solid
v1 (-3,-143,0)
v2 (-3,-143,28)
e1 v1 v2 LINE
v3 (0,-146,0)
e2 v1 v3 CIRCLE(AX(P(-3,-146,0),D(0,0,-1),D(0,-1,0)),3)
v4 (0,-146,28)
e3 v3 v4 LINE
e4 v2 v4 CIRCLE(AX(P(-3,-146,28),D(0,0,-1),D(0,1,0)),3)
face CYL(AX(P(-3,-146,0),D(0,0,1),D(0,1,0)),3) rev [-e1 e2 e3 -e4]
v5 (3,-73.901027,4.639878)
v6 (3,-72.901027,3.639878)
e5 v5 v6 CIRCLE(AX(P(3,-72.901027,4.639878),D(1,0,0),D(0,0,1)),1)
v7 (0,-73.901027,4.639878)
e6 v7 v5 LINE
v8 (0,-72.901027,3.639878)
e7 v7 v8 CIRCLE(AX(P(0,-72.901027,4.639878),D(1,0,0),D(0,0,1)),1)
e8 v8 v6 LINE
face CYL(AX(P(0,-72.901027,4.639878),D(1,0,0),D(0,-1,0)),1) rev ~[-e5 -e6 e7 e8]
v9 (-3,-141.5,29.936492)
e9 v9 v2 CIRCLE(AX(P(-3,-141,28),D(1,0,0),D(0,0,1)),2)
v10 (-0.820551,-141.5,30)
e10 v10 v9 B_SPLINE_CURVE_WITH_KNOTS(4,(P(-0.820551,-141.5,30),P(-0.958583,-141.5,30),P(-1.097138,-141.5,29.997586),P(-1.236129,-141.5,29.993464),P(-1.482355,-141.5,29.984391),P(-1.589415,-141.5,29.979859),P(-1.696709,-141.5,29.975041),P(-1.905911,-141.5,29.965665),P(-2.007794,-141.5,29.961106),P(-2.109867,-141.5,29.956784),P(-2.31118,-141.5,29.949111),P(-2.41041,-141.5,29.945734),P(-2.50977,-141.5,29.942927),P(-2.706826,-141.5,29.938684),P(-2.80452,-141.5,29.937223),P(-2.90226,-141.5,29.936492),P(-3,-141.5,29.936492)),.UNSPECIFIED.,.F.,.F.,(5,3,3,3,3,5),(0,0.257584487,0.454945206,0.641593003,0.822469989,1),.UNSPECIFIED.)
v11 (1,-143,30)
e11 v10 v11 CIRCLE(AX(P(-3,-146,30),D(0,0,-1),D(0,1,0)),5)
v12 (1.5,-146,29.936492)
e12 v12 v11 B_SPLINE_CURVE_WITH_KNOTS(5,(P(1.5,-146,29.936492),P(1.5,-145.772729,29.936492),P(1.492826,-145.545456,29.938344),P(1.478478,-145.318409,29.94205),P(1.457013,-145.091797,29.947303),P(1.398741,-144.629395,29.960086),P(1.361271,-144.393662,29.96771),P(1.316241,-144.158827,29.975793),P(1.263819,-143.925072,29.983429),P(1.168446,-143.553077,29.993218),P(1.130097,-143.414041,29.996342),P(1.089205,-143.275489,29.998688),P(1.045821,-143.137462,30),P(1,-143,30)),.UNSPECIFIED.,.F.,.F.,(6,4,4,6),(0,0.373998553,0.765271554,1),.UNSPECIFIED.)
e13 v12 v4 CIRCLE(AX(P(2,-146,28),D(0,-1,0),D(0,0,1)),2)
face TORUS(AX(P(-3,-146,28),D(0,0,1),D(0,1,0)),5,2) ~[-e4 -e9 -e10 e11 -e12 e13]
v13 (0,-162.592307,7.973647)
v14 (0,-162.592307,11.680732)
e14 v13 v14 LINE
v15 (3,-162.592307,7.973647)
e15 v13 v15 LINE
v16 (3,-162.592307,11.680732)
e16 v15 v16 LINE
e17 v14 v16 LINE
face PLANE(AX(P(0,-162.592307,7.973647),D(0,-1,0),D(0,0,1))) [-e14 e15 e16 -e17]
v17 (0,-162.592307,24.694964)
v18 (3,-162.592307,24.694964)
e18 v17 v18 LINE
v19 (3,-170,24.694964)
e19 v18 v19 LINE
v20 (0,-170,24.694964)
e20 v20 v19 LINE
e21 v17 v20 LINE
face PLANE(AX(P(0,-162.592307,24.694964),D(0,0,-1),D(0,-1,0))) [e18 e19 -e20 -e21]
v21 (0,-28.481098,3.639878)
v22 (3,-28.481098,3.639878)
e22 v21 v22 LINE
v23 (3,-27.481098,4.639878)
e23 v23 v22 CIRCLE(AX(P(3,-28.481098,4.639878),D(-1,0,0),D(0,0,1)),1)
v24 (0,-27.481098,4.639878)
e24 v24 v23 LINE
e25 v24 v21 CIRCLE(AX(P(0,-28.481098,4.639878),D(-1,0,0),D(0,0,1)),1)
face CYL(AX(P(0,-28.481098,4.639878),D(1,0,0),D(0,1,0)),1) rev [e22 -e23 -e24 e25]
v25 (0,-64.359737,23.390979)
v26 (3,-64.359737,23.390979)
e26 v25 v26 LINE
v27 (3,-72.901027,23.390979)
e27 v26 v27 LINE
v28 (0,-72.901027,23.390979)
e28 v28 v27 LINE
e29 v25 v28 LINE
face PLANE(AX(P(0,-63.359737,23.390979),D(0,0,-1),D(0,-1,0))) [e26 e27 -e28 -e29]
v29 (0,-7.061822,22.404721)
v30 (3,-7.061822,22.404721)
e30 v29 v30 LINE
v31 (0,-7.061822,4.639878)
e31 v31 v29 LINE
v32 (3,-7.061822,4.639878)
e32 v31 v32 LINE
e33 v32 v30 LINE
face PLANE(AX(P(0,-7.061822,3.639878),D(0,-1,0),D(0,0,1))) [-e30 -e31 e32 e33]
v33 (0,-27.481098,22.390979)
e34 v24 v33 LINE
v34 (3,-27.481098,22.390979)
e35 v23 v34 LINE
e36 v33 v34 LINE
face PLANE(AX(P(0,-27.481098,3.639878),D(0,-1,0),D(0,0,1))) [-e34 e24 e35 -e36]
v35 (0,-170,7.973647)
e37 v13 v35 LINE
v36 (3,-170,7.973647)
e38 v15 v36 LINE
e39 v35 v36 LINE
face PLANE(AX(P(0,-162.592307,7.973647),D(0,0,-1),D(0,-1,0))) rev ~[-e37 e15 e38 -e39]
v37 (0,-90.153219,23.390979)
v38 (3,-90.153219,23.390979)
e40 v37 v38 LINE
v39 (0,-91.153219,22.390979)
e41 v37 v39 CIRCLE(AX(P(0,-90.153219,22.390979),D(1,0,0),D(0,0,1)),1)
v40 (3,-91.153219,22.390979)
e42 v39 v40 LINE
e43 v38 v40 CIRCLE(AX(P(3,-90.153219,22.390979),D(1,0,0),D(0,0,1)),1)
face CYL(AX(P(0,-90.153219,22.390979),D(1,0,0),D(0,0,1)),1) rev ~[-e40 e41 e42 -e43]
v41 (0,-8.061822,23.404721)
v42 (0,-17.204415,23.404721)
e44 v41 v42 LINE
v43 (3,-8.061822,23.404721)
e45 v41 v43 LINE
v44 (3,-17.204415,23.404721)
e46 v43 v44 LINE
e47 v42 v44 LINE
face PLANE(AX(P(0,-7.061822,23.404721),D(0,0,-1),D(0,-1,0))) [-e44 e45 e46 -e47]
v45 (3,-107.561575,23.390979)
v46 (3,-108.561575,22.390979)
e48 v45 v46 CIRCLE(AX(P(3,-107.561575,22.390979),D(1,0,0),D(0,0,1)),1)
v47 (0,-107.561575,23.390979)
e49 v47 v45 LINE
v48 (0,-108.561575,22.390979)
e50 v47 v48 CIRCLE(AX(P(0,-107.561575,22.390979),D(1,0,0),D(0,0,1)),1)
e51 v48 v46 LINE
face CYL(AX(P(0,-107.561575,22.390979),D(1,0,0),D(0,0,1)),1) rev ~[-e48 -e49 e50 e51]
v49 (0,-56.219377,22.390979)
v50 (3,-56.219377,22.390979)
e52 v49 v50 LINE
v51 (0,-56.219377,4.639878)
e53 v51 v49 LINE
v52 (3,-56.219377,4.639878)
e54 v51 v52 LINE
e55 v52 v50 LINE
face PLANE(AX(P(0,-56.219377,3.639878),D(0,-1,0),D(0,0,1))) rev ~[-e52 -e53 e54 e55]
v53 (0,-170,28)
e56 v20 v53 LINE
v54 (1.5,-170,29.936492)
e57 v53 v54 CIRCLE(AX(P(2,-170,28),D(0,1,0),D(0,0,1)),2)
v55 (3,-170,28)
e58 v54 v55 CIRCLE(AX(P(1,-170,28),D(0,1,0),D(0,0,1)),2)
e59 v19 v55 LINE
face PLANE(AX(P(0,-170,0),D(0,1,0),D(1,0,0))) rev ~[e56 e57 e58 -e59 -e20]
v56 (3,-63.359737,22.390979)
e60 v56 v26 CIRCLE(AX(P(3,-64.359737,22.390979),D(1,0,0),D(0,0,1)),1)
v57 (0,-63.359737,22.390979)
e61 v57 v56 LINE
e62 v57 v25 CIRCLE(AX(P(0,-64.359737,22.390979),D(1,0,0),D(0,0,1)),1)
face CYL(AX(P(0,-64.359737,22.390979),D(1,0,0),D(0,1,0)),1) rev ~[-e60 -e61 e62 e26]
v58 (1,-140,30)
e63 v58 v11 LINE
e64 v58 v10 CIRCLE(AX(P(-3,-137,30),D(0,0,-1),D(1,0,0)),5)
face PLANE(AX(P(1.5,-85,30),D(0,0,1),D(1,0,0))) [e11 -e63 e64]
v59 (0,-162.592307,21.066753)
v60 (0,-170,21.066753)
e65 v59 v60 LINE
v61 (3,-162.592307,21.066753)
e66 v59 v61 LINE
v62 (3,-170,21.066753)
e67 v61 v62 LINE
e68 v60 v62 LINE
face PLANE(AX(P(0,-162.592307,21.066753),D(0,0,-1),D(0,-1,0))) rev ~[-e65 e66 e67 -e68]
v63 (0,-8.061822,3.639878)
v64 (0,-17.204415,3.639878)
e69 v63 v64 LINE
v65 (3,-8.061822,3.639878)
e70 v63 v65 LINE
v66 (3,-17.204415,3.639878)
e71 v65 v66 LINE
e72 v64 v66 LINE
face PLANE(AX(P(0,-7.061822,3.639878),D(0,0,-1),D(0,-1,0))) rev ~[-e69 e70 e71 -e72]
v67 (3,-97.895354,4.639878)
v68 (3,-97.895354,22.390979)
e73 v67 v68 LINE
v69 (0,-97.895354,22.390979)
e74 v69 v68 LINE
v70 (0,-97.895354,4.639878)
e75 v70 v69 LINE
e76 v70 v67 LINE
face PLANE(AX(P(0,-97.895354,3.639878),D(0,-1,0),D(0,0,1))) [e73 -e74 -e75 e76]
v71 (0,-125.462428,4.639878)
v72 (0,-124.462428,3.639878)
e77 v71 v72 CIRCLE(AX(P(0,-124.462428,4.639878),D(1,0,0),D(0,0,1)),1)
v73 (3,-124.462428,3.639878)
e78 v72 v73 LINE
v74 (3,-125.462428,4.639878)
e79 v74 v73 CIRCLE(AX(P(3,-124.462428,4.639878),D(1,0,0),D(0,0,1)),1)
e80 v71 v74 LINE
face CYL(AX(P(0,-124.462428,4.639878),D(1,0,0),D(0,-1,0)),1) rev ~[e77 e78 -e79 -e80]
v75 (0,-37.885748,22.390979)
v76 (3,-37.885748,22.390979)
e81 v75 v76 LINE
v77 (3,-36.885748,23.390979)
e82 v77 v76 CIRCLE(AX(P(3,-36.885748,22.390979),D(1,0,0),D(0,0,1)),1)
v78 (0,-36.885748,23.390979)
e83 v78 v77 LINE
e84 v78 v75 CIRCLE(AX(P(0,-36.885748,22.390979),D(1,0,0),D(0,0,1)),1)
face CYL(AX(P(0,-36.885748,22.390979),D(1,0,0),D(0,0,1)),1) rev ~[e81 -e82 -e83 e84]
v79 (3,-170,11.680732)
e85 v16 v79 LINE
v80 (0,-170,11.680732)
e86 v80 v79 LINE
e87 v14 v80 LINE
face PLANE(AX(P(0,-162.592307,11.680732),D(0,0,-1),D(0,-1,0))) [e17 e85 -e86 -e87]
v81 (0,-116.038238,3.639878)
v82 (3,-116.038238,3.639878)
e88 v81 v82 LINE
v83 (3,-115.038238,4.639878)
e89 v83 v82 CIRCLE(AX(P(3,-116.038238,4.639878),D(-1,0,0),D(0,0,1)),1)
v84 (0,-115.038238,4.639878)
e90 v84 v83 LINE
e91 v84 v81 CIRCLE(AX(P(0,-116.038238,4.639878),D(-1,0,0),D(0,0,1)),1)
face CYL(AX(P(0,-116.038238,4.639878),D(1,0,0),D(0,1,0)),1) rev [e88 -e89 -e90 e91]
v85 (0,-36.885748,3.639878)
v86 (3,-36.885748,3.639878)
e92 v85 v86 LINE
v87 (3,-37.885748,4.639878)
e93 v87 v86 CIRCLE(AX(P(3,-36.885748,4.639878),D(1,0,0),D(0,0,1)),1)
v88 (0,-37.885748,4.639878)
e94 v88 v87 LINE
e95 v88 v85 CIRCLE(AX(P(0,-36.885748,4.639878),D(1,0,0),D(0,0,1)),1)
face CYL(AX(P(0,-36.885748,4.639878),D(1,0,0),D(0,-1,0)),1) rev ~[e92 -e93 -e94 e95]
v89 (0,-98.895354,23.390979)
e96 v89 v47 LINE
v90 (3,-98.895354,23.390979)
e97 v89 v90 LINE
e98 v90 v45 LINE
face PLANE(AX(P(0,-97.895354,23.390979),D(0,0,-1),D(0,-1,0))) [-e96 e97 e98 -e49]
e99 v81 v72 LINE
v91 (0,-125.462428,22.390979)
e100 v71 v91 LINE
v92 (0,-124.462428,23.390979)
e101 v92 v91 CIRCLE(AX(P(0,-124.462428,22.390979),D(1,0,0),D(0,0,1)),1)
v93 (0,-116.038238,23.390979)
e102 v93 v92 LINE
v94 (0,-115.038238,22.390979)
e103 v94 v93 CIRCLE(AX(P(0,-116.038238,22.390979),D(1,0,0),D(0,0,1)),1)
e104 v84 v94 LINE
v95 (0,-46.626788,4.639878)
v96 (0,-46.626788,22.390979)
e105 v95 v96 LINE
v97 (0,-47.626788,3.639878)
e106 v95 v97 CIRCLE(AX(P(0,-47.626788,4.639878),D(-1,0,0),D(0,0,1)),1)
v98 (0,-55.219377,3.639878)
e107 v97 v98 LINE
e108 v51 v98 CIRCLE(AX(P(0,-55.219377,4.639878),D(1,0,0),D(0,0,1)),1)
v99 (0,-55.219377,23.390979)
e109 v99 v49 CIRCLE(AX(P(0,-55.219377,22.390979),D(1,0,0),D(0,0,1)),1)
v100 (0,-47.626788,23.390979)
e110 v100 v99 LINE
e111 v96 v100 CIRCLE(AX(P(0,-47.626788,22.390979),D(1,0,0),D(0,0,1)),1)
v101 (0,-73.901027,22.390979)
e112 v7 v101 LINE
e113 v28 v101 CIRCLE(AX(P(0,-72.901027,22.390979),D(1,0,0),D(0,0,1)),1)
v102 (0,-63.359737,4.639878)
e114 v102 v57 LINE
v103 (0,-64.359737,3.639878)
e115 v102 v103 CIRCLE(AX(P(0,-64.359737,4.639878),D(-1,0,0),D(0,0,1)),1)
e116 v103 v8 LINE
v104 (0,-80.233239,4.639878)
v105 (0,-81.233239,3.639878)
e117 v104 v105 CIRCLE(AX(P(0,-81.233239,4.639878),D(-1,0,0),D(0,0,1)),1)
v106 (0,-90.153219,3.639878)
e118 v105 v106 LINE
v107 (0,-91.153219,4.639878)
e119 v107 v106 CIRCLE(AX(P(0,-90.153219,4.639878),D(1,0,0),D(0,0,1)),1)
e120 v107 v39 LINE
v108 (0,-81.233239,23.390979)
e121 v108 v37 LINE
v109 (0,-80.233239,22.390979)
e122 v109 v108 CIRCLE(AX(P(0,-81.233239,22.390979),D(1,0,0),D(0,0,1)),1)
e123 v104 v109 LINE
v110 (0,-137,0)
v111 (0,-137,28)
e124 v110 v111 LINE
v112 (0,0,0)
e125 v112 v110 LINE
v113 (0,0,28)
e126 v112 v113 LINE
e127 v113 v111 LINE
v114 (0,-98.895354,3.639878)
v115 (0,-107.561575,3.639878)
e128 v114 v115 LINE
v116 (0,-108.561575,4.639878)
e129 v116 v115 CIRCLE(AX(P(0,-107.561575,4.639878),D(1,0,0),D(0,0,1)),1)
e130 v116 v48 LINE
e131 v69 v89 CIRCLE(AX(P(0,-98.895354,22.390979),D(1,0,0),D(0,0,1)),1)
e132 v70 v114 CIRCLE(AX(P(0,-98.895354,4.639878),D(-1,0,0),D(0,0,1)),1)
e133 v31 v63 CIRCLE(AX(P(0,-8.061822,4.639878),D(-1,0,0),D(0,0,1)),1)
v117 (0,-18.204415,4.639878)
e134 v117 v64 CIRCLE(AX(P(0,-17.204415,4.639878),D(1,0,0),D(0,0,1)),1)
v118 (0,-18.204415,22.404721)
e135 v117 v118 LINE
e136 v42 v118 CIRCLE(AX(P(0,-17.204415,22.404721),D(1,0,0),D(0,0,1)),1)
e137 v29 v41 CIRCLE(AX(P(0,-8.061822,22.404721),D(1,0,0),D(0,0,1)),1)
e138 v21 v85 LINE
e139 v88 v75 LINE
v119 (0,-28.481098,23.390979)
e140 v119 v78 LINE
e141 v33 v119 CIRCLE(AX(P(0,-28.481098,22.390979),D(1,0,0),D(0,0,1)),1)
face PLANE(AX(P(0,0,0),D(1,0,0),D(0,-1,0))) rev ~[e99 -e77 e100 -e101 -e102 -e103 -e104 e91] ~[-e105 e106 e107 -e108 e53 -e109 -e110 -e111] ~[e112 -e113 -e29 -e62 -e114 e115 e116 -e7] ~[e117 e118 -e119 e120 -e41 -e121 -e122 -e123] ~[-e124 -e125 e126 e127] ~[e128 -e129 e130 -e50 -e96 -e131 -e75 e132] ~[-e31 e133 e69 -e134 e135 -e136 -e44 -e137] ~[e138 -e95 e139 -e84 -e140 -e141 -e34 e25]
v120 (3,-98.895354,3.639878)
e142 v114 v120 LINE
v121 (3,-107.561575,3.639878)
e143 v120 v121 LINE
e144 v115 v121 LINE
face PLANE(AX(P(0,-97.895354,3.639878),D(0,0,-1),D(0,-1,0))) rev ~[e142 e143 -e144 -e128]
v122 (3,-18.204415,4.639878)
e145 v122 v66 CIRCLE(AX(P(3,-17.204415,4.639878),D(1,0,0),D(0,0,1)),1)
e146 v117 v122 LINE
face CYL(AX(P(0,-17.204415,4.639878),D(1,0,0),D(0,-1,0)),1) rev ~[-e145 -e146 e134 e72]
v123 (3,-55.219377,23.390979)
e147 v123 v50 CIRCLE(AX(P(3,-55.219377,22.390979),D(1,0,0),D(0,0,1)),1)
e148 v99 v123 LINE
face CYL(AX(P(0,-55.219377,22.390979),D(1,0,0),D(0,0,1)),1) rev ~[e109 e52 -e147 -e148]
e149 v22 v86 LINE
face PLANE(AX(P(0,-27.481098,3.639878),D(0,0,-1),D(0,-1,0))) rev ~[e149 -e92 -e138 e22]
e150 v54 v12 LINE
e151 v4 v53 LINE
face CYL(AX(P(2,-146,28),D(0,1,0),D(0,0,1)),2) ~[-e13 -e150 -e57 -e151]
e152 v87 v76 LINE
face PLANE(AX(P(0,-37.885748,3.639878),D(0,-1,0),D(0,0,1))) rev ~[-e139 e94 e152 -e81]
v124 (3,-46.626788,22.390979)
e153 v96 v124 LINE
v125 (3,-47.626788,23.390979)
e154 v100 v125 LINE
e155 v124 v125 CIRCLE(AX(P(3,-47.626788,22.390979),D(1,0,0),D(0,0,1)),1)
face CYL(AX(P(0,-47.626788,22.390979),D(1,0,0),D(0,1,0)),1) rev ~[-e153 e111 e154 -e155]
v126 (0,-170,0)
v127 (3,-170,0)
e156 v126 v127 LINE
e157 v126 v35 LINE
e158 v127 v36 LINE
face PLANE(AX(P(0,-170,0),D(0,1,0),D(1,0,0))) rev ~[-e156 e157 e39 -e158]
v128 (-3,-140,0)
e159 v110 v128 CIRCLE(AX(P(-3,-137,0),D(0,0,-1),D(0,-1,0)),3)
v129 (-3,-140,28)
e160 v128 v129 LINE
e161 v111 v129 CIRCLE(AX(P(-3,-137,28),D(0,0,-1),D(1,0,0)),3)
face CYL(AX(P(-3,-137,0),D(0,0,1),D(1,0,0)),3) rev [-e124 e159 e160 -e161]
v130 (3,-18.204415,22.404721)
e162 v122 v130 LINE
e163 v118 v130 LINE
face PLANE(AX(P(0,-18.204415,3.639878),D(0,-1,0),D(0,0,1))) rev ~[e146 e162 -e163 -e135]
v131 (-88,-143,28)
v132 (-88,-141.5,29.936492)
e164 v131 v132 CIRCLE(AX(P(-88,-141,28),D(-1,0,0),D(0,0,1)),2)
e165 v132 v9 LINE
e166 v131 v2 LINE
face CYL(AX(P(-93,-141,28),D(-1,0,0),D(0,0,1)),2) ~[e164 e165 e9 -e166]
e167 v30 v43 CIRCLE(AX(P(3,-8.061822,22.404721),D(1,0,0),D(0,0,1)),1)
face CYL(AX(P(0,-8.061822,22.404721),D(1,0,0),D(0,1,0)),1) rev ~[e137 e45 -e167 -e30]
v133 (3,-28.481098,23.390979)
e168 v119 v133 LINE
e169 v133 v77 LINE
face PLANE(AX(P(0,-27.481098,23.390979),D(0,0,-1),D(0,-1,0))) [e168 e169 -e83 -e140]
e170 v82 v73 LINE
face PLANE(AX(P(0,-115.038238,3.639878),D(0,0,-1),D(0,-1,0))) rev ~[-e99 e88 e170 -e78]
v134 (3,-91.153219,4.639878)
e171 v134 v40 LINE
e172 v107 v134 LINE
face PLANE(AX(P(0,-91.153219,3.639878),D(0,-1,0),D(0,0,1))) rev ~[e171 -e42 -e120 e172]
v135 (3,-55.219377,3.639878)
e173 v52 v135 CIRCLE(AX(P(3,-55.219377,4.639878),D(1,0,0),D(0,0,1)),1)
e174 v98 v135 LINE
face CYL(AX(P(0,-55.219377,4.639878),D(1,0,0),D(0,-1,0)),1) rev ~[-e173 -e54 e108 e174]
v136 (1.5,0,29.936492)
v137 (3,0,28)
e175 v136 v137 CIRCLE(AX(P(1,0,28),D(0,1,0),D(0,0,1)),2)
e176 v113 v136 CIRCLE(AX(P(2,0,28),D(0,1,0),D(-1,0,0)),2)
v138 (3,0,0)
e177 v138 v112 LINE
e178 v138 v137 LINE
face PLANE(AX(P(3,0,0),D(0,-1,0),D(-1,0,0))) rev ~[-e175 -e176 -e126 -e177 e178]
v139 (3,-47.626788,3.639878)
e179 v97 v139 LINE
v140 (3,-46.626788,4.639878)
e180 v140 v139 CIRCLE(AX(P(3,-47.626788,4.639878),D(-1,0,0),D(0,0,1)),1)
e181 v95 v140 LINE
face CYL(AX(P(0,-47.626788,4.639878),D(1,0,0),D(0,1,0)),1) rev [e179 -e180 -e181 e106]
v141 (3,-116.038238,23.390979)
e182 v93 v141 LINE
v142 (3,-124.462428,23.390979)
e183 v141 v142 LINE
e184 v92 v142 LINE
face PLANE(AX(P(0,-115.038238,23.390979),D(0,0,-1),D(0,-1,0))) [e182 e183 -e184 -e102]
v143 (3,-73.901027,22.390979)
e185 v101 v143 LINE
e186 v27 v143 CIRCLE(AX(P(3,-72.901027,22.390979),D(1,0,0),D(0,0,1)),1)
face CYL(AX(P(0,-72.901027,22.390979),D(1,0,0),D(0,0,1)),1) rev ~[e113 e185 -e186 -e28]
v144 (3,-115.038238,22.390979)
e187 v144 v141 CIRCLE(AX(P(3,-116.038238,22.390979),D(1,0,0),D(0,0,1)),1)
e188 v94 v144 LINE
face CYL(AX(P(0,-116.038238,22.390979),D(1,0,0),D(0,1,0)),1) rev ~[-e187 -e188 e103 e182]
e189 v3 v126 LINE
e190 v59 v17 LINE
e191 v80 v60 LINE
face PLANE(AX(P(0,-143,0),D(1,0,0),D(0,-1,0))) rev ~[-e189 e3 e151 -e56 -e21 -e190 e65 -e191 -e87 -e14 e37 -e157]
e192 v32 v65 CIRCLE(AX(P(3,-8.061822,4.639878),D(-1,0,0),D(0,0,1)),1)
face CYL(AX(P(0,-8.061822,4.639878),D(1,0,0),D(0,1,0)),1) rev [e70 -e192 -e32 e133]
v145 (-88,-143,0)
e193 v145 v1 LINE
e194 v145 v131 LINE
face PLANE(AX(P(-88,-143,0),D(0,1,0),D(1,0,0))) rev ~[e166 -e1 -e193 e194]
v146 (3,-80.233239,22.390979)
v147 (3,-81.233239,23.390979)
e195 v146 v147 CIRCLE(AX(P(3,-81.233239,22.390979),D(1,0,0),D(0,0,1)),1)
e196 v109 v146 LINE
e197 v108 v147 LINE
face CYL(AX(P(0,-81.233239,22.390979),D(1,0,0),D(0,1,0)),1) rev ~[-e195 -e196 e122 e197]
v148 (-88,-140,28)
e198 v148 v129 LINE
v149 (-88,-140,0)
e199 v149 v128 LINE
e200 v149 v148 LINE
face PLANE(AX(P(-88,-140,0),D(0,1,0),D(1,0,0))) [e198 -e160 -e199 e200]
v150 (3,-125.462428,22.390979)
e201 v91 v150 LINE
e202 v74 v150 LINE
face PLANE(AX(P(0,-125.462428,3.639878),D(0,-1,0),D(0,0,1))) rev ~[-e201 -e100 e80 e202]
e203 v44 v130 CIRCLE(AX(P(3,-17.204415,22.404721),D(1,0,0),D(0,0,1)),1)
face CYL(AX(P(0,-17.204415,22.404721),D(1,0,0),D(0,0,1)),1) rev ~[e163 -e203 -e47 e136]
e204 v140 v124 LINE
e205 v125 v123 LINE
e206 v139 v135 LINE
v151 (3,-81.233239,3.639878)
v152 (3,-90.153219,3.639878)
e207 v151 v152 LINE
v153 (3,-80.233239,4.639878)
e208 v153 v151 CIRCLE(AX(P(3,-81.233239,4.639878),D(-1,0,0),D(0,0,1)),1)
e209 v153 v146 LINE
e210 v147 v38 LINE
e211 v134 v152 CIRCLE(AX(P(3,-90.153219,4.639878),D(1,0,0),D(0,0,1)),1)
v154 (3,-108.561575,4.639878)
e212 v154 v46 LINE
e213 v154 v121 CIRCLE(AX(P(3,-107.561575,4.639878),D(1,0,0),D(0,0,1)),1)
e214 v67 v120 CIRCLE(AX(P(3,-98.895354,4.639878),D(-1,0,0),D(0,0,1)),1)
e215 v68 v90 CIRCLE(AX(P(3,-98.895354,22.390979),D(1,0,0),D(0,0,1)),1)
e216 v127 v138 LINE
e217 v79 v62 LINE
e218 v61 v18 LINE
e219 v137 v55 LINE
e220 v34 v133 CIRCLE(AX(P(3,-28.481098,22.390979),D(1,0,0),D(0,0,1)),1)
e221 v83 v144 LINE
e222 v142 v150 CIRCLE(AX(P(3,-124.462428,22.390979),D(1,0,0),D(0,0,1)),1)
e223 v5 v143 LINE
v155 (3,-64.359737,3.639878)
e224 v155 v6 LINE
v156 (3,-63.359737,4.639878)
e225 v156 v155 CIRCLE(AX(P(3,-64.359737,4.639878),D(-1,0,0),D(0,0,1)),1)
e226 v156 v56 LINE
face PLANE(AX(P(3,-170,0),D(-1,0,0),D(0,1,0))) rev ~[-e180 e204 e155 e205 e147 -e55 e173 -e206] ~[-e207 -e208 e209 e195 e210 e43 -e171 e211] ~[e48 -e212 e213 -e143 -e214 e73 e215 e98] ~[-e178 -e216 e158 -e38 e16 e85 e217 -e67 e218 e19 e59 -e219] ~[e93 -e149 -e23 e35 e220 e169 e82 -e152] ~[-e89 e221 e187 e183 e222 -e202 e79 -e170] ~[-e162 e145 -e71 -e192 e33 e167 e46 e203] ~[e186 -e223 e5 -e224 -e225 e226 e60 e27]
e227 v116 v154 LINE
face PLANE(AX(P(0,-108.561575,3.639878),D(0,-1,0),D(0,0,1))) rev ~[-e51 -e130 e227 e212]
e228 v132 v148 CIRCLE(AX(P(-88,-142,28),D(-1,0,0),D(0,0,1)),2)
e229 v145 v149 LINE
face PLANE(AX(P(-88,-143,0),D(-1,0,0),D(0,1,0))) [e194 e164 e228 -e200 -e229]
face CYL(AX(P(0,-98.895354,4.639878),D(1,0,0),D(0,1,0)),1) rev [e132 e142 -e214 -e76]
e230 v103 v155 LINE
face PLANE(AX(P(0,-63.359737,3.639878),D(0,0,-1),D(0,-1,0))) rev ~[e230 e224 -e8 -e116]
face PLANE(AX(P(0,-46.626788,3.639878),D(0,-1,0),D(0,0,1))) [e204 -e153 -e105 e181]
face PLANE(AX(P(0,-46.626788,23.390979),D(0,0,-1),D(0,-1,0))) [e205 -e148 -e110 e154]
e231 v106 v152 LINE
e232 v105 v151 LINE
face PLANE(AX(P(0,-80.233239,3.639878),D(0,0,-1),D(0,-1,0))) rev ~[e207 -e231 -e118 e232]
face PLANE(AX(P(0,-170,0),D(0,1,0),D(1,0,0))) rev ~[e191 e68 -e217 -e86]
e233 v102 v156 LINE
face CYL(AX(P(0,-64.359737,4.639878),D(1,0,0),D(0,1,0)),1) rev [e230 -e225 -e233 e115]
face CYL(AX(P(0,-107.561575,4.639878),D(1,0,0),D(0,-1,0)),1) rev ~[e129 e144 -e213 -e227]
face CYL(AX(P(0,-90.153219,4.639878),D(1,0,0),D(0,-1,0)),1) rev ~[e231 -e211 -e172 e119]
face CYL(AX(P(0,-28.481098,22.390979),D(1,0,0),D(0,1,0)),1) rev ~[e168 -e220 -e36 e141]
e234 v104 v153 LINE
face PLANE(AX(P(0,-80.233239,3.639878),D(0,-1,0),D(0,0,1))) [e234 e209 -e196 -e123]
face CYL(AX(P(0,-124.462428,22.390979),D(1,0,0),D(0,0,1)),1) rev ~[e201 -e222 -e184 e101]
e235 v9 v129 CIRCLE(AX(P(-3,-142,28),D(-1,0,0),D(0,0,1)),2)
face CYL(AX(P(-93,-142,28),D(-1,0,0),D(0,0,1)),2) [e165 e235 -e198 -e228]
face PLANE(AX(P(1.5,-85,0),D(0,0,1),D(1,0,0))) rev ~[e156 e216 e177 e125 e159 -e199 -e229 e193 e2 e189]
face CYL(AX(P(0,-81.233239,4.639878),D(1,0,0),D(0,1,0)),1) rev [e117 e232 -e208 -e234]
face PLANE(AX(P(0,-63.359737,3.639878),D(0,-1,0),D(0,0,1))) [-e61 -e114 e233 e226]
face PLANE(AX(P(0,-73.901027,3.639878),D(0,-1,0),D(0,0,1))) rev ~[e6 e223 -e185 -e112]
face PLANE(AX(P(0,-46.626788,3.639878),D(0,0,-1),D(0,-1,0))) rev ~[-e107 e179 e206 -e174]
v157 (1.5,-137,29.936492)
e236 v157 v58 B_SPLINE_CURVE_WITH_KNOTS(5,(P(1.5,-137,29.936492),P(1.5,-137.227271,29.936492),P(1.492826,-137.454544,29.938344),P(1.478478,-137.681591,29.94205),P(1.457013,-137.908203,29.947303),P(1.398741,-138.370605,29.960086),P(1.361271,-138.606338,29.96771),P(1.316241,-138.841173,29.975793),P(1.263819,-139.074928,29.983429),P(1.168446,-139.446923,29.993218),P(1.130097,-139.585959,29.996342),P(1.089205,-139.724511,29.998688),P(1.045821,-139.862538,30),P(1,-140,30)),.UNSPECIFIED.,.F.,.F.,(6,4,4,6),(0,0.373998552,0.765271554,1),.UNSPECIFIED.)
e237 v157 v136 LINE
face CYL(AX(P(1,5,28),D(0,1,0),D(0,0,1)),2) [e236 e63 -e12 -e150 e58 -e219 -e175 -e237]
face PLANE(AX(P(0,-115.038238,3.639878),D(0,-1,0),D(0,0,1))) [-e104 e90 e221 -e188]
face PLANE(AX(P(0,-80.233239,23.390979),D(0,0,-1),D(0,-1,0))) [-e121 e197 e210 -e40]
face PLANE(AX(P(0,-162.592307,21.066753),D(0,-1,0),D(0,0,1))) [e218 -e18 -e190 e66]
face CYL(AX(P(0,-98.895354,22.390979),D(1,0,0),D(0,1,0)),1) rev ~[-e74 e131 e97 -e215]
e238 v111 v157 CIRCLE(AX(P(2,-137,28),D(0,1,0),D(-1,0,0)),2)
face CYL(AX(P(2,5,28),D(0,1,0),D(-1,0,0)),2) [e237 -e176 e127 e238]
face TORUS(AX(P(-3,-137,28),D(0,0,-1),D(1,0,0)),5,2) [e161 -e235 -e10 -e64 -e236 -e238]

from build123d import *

# Parameters (mm, degrees)
F0_W         = 88
F0_H         = 3
F1_DEPTH     = 30
F2_R         = 3
F3_T1_DEPTH  = 142
F3_T3_DEPTH  = 90
F3_T5_DEPTH  = 180
F3_T7_DEPTH  = 29
F3_T10_ANGLE = 90
F3_T12_ANGLE = 90
F4_W         = 7.4076932669
F4_H         = 3.6282110959
F4_H_2       = 3.7070848048
F5_DEPTH     = 3
F6_W         = 11.1425933428
F6_H         = 19.764843164
F6_W_2       = 10.4046501219
F6_H_2       = 19.7511005681
F6_W_3       = 9.5925889909
F6_W_4       = 10.5412900448
F6_W_5       = 10.9199807048
F6_W_6       = 10.6662213802
F6_W_7       = 10.4241892695
F7_DEPTH     = 3
F8_R         = 1


# Not quite as in the source:
# - a fillet or chamfer that OpenCascade refuses, or shapes differently, is made with other operations: its cross-section is extruded or revolved along the edge and cut away or added


with BuildPart() as f1:
    # F0 (on Top) → F1 (new body)
    with BuildSketch(Plane.XY):
        Polygon((3, 0), (0, 0), (0, -140), (0, -143), (0, -170), (3, -170), (3, -140), align=None)
        with Locations((-44, -141.5)):
            Rectangle(F0_W, F0_H)
    extrude(amount=F1_DEPTH)

    # F2
    f2_edges = [f1.edges().sort_by_distance(p)[0] for p in [
        (0, -140, 15),
        (0, -143, 15),
    ]]
    fillet(f2_edges, radius=F2_R)

    # F3: fillet of radius 2 on 3 edges, made by hand

    # F3_s2 → F3_t1 (cut)
    with BuildSketch(Plane.XZ.offset(-5)):
        with BuildLine():
            ThreePointArc((0, 28), (0.5857864376, 29.4142135624), (2, 30))
            Line((2, 30), (0, 30))
            Line((0, 30), (0, 28))
        make_face()
    extrude(amount=F3_T1_DEPTH, mode=Mode.SUBTRACT)

    # F3_s4 → F3_t3 (cut)
    with BuildSketch(Plane.YZ.offset(-93)):
        with BuildLine():
            ThreePointArc((-141, 30), (-142.4142135624, 29.4142135624), (-143, 28))
            Line((-143, 28), (-143, 30))
            Line((-143, 30), (-141, 30))
        make_face()
        with BuildLine():
            ThreePointArc((-142, 30), (-140.5857864376, 29.4142135624), (-140, 28))
            Line((-140, 28), (-140, 30))
            Line((-140, 30), (-142, 30))
        make_face()
    extrude(amount=F3_T3_DEPTH, mode=Mode.SUBTRACT)

    # F3_s6 → F3_t5 (cut)
    with BuildSketch(Plane.XZ.offset(-5)):
        with BuildLine():
            ThreePointArc((1, 30), (2.4142135624, 29.4142135624), (3, 28))
            Line((3, 28), (3, 30))
            Line((3, 30), (1, 30))
        make_face()
    extrude(amount=F3_T5_DEPTH, mode=Mode.SUBTRACT)

    # F3_s8 → F3_t7 (cut)
    with BuildSketch(Plane.XZ.offset(146)):
        with BuildLine():
            ThreePointArc((2, 30), (0.5857864376, 29.4142135624), (0, 28))
            Line((0, 28), (0, 30))
            Line((0, 30), (2, 30))
        make_face()
    extrude(amount=F3_T7_DEPTH, mode=Mode.SUBTRACT)

    # F3_s9 → F3_t10 (revolve, cut)
    with BuildSketch(Plane.YZ.offset(-3)):
        with BuildLine():
            ThreePointArc((-141, 30), (-142.4142135624, 29.4142135624), (-143, 28))
            Line((-143, 28), (-143, 30))
            Line((-143, 30), (-141, 30))
        make_face()
    revolve(axis=Axis((-3, -146, 30), (0, 0, -1)), revolution_arc=F3_T10_ANGLE, mode=Mode.SUBTRACT)

    # F3_s11 → F3_t12 (revolve, cut)
    with BuildSketch(Plane.XZ.offset(137)):
        with BuildLine():
            ThreePointArc((0, 28), (0.5857864376, 29.4142135624), (2, 30))
            Line((2, 30), (0, 30))
            Line((0, 30), (0, 28))
        make_face()
    revolve(axis=Axis((-3, -137, 30), (0, 0, -1)), revolution_arc=F3_T12_ANGLE, mode=Mode.SUBTRACT)

    # F4 (on face) → F5 (cut)
    with BuildSketch(Plane(origin=(0, 0, 0), x_dir=(0, -1, 0), z_dir=(-1, 0, 0))):
        with Locations((166.2961533666, 22.8808587417)):
            Rectangle(F4_W, F4_H)
        with Locations((166.2961533666, 9.8271891475)):
            Rectangle(F4_W, F4_H_2)
    extrude(amount=-F5_DEPTH, mode=Mode.SUBTRACT)

    # F6 (on face) → F7 (cut)
    with BuildSketch(Plane(origin=(0, 0, 0), x_dir=(0, -1, 0), z_dir=(-1, 0, 0))):
        with Locations((12.6331185456, 13.5222995887)):
            Rectangle(F6_W, F6_H)
        with Locations((32.683422789, 13.5154282907)):
            Rectangle(F6_W_2, F6_H_2)
        with Locations((51.4230821282, 13.5154282907)):
            Rectangle(F6_W_3, F6_H_2)
        with Locations((68.6303824186, 13.5154282907)):
            Rectangle(F6_W_4, F6_H_2)
        with Locations((85.6932289898, 13.5154282907)):
            Rectangle(F6_W_5, F6_H_2)
        with Locations((103.2284647226, 13.5154282907)):
            Rectangle(F6_W_6, F6_H_2)
        with Locations((120.2503331006, 13.5154282907)):
            Rectangle(F6_W_7, F6_H_2)
    extrude(amount=-F7_DEPTH, mode=Mode.SUBTRACT)

    # F8
    f8_edges = [f1.edges().sort_by_distance(p)[0] for p in [
        (1.5, -7.061822, 23.404721),
        (1.5, -27.481098, 23.390979),
        (1.5, -46.626788, 23.390979),
        (1.5, -63.359737, 23.390979),
        (1.5, -80.233239, 23.390979),
        (1.5, -97.895354, 23.390979),
        (1.5, -115.038238, 23.390979),
        (1.5, -7.061822, 3.639878),
        (1.5, -27.481098, 3.639878),
        (1.5, -46.626788, 3.639878),
        (1.5, -63.359737, 3.639878),
        (1.5, -80.233239, 3.639878),
        (1.5, -97.895354, 3.639878),
        (1.5, -115.038238, 3.639878),
        (1.5, -125.462428, 23.390979),
        (1.5, -108.561575, 23.390979),
        (1.5, -91.153219, 23.390979),
        (1.5, -73.901027, 23.390979),
        (1.5, -56.219377, 23.390979),
        (1.5, -37.885748, 23.390979),
        (1.5, -18.204415, 23.404721),
        (1.5, -18.204415, 3.639878),
        (1.5, -37.885748, 3.639878),
        (1.5, -56.219377, 3.639878),
        (1.5, -73.901027, 3.639878),
        (1.5, -91.153219, 3.639878),
        (1.5, -108.561575, 3.639878),
        (1.5, -125.462428, 3.639878),
    ]]
    fillet(f8_edges, radius=F8_R)


solid = f1.part
